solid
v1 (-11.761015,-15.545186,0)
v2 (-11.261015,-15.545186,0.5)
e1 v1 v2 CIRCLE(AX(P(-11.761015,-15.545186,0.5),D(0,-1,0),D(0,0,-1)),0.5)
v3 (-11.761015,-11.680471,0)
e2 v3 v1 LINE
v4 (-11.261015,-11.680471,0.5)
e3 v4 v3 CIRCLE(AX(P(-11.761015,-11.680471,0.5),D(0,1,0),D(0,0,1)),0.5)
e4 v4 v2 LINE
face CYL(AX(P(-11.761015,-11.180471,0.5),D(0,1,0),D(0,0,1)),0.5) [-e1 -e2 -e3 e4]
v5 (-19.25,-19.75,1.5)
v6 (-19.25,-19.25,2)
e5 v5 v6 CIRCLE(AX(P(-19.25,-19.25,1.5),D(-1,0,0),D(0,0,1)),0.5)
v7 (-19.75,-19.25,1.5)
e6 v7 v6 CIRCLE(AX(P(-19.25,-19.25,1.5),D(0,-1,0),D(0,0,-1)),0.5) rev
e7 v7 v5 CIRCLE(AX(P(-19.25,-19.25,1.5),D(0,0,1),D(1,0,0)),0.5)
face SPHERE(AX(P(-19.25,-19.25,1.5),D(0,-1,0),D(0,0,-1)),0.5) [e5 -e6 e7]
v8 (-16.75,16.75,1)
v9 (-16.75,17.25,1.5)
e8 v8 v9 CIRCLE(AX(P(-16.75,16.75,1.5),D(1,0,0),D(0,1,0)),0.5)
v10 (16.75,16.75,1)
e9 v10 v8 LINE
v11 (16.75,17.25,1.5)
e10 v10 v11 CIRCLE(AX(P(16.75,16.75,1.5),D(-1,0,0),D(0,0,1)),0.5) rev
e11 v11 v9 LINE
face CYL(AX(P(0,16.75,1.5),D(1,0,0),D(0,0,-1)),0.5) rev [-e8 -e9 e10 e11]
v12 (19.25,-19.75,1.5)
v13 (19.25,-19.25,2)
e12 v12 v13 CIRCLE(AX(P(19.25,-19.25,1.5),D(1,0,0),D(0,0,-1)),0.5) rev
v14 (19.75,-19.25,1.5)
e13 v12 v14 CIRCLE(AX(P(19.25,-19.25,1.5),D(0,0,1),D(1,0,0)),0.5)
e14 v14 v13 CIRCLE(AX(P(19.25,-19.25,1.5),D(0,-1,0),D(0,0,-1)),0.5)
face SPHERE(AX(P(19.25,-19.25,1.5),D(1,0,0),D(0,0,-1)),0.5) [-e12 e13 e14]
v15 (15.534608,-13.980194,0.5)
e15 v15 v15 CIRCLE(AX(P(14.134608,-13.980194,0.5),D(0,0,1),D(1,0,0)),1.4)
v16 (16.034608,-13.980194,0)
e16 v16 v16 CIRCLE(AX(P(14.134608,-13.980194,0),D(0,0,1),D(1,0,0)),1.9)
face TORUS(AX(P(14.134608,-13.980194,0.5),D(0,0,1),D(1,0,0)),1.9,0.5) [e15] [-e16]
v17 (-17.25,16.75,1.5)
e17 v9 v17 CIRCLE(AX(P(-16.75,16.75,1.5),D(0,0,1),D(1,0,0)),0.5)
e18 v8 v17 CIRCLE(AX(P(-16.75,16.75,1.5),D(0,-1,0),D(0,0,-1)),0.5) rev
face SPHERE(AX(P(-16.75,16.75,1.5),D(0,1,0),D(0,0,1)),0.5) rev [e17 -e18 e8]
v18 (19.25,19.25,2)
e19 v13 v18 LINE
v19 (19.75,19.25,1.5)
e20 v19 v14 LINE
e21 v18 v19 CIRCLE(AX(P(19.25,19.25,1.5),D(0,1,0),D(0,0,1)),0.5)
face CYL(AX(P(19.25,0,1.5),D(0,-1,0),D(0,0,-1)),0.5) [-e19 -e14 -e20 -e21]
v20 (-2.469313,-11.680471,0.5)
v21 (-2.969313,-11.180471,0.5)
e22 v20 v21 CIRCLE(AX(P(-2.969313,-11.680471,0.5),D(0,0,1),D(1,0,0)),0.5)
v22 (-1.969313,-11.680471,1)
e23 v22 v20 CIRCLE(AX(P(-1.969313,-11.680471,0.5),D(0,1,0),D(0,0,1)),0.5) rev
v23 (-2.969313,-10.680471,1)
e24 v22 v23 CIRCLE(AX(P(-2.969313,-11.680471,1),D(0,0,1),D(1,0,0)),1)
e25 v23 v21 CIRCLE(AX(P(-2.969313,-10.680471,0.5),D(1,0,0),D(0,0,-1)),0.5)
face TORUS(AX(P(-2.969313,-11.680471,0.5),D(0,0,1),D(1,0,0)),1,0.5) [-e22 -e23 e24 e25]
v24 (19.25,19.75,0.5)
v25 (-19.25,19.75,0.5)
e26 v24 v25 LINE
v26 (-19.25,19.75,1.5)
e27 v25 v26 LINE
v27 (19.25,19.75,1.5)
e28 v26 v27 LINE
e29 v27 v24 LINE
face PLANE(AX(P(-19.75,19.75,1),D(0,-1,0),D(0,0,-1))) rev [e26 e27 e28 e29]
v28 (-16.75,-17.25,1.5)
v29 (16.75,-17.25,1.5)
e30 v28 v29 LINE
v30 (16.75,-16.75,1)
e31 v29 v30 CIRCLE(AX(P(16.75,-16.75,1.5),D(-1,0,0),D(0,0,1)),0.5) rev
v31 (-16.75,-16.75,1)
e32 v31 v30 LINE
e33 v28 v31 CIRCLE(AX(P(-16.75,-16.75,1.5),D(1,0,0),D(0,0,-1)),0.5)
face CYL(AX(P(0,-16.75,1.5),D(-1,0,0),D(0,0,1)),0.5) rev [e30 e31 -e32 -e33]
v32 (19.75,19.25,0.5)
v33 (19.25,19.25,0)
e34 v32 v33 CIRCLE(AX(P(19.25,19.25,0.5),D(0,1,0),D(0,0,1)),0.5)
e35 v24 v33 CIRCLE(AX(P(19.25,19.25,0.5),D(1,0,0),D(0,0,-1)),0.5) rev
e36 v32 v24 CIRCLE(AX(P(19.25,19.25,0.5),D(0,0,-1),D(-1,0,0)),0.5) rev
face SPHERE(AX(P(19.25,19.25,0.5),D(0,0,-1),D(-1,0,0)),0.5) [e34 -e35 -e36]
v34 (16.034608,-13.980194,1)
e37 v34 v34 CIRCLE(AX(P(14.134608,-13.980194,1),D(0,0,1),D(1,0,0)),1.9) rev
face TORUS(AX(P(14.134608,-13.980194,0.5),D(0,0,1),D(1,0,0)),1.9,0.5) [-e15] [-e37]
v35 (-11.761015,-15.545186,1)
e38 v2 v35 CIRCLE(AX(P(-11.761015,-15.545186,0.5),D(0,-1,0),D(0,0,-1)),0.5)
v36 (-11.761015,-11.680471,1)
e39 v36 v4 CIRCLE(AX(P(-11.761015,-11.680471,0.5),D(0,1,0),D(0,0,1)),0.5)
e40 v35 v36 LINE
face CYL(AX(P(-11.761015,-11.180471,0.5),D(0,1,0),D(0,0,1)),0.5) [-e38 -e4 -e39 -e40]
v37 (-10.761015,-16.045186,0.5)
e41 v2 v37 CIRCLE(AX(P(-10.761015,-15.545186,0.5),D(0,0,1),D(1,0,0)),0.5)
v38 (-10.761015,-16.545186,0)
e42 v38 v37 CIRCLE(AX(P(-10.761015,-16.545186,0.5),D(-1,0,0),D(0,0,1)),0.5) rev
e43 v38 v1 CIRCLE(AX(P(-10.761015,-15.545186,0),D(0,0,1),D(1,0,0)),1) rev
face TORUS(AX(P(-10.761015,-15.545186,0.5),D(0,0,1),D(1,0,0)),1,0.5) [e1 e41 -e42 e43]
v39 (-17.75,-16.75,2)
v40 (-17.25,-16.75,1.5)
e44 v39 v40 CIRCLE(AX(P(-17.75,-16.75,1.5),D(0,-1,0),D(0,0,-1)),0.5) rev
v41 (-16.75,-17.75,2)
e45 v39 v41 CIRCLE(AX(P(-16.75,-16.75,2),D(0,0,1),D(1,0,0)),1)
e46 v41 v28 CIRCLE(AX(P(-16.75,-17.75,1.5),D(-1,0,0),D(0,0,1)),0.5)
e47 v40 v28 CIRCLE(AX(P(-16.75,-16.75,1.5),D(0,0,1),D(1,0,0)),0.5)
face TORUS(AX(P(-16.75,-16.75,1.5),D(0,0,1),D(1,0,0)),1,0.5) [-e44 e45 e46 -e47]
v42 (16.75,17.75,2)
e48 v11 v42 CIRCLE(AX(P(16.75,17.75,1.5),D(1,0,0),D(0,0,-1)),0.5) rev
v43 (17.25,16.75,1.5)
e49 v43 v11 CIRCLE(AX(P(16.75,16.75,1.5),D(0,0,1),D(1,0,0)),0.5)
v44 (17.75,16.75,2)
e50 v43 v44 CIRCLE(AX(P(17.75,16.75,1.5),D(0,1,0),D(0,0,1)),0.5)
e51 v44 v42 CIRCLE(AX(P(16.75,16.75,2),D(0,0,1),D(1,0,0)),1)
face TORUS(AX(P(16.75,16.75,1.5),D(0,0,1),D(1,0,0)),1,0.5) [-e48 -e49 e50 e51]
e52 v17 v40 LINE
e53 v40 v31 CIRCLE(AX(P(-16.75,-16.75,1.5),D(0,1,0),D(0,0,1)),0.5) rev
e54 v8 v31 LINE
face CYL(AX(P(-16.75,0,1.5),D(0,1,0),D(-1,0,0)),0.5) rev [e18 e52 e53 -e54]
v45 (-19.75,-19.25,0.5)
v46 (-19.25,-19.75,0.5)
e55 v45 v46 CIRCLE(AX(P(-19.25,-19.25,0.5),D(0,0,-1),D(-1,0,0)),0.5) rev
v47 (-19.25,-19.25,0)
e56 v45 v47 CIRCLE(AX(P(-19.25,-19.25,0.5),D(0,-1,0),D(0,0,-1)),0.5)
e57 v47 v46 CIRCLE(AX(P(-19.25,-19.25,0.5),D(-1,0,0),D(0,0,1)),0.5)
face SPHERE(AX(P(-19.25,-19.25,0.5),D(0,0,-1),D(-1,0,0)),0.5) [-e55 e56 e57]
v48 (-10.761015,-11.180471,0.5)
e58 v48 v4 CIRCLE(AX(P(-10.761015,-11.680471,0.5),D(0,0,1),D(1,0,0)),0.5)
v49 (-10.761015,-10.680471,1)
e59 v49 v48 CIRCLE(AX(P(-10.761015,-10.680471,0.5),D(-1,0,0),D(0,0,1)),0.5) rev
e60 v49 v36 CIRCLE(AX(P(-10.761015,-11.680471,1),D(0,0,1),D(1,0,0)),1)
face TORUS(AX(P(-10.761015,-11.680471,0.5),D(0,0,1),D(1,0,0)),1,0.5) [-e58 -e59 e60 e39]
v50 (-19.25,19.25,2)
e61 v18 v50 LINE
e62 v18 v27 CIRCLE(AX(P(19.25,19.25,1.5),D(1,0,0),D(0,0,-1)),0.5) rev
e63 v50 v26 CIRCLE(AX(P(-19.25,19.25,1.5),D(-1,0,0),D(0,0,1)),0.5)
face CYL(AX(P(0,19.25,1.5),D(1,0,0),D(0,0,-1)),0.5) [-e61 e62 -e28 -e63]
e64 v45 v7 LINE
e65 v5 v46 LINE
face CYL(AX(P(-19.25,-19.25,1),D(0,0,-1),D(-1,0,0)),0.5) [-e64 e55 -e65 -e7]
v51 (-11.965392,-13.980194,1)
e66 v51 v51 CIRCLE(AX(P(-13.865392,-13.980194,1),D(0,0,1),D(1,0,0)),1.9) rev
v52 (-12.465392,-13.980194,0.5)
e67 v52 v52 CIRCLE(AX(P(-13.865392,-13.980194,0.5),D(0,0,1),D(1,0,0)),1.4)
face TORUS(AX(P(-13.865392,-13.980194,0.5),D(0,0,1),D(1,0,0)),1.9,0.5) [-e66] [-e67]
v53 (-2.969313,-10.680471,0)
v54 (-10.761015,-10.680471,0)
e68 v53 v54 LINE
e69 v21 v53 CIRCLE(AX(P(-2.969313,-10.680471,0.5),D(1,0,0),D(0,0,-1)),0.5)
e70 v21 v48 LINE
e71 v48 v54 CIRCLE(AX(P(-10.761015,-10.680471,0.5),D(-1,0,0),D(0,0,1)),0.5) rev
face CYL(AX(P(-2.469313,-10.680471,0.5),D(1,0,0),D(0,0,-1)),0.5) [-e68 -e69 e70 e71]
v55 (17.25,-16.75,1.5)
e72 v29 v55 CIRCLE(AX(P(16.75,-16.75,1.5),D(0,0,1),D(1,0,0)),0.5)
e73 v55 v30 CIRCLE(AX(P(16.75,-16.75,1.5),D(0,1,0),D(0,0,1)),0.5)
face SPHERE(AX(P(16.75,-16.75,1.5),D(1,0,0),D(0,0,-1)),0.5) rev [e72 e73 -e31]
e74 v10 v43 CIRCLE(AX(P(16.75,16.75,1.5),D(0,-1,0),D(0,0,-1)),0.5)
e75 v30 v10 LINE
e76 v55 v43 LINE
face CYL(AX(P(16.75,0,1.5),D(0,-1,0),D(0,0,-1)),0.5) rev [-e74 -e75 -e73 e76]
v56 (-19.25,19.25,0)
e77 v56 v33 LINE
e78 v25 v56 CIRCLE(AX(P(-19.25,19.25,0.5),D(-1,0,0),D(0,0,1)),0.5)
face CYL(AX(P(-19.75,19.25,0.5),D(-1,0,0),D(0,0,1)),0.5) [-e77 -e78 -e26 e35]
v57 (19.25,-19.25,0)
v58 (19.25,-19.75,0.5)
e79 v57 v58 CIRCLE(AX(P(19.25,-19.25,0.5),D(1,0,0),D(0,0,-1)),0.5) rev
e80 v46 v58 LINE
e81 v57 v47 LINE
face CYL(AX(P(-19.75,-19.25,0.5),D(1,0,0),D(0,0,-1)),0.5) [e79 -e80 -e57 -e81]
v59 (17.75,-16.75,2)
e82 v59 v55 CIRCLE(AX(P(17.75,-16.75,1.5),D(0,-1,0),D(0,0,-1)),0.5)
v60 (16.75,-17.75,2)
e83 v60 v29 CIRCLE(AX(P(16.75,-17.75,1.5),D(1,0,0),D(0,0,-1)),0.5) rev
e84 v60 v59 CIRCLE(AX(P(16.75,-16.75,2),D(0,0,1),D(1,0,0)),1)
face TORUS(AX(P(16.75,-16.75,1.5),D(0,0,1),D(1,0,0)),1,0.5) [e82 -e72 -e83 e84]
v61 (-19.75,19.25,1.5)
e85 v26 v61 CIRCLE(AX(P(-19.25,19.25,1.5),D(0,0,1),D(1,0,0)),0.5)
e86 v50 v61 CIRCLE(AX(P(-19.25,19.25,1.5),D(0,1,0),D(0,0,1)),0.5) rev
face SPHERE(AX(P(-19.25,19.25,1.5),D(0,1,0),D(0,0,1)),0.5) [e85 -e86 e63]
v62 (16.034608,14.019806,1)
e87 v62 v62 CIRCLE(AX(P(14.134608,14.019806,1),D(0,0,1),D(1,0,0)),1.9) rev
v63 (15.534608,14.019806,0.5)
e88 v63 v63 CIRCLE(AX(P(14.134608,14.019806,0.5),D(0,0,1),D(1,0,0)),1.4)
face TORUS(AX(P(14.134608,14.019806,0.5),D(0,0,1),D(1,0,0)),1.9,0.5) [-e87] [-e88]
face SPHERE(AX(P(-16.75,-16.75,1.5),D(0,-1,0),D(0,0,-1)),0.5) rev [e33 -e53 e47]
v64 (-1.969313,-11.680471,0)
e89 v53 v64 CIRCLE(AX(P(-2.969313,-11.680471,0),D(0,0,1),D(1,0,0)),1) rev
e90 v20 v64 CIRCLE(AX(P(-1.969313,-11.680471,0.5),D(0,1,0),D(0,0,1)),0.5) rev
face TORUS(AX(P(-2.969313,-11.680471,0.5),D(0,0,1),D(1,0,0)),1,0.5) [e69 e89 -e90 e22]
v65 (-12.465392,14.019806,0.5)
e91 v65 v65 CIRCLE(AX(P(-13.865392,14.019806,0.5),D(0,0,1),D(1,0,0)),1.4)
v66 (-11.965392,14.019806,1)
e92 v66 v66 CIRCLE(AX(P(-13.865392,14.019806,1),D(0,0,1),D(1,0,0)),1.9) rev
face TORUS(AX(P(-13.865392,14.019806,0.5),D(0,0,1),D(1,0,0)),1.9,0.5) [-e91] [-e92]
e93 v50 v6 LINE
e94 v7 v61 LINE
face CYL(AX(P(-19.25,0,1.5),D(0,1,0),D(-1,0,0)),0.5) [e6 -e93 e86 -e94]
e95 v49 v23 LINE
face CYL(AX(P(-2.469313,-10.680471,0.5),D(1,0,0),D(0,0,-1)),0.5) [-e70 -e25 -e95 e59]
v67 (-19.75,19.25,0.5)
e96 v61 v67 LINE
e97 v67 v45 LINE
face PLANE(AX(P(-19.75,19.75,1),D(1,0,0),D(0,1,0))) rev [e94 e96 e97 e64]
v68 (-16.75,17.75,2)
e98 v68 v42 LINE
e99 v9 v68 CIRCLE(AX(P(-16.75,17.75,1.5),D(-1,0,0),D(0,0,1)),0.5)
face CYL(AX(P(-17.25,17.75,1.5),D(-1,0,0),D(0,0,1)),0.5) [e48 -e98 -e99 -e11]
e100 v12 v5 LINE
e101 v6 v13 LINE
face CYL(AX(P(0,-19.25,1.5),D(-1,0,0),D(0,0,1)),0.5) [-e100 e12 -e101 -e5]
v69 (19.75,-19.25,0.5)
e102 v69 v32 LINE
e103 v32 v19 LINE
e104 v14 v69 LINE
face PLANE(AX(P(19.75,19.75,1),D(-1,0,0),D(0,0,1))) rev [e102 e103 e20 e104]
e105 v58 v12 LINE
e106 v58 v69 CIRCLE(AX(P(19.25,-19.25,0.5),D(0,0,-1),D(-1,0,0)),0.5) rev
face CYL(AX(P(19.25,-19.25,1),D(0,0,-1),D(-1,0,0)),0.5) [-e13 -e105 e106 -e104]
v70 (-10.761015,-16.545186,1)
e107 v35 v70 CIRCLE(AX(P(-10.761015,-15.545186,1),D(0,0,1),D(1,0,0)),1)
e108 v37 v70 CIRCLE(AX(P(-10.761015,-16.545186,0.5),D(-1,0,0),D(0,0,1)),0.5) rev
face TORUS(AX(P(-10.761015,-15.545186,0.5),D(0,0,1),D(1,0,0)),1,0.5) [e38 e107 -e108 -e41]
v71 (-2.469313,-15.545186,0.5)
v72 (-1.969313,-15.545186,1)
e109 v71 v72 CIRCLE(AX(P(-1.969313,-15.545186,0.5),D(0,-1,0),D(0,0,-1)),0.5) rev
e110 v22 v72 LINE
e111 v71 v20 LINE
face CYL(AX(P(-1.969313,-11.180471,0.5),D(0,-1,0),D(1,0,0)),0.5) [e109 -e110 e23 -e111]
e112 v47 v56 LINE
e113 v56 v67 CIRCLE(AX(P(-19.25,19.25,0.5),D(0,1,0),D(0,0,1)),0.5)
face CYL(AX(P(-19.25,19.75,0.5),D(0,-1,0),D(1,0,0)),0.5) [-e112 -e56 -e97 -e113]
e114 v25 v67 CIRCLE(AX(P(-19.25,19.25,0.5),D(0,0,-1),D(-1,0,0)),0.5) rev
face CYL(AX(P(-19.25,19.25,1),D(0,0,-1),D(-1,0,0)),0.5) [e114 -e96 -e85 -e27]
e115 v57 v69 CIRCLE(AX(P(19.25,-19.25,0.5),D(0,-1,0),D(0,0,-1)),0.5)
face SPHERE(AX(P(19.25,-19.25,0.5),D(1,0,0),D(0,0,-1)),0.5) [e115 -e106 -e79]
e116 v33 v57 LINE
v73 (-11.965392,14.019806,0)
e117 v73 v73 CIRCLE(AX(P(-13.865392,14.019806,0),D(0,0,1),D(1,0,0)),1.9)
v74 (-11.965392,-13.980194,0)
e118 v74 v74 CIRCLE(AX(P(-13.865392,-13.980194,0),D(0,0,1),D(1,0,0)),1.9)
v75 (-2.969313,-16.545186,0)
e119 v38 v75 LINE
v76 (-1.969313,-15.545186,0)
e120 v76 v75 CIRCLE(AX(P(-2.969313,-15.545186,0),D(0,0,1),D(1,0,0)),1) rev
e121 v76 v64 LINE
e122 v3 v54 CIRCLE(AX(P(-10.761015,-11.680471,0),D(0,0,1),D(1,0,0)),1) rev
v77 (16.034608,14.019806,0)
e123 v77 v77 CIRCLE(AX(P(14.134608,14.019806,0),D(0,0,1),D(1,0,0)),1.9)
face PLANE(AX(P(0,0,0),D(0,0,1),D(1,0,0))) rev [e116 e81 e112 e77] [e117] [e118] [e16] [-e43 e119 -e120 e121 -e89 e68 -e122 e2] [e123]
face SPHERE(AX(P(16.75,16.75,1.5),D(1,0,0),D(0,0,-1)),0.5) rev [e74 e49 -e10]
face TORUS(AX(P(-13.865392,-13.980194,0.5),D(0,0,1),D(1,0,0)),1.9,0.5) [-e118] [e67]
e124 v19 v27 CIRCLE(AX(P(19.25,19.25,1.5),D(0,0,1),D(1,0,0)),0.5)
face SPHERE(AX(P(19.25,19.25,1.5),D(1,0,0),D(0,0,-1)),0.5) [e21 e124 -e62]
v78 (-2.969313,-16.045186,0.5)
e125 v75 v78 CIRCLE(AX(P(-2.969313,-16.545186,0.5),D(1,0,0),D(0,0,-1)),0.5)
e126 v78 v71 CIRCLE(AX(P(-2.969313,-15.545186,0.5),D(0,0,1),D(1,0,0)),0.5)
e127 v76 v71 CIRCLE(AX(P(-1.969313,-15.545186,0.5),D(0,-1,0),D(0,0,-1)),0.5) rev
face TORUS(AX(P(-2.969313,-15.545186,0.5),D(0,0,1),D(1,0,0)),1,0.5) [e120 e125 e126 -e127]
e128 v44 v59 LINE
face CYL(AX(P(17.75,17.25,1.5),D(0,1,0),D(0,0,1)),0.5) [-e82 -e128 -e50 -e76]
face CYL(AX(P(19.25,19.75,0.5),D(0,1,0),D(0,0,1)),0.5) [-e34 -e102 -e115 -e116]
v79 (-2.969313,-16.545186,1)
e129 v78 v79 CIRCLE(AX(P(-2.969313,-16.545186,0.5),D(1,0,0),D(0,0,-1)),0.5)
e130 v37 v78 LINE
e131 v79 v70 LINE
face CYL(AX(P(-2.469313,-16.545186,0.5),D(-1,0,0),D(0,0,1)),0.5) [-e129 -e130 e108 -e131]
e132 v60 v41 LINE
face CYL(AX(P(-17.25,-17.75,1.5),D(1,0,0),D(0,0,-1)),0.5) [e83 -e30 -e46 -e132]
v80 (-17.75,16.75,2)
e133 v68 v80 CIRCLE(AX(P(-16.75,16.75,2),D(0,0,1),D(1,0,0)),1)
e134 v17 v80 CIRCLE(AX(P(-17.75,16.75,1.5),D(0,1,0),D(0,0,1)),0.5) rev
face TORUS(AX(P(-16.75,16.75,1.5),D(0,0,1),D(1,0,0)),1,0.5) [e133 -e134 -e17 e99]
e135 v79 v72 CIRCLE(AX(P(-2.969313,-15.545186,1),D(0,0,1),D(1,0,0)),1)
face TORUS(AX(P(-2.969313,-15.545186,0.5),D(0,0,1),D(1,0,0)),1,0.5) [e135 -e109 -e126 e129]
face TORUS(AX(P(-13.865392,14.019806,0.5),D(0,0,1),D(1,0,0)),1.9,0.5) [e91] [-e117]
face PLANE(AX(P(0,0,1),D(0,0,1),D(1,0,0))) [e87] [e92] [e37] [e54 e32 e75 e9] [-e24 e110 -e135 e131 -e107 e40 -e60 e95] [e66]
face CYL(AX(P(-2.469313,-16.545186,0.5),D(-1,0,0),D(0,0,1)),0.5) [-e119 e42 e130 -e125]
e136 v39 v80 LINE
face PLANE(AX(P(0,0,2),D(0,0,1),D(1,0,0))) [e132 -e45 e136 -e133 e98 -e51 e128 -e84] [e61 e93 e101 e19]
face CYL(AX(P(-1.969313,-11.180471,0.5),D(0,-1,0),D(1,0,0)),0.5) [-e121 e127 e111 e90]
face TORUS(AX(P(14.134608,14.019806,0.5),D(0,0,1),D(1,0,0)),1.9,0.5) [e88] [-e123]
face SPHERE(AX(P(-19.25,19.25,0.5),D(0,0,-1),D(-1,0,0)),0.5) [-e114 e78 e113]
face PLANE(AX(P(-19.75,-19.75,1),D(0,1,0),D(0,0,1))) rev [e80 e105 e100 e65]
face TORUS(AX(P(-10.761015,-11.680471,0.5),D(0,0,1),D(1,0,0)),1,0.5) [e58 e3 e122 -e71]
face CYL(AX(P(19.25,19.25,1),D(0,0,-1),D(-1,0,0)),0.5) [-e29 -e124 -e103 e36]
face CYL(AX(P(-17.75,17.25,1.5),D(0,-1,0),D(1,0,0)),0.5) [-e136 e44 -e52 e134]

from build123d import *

# Parameters (mm, degrees)
SKETCH1_W           = 39.5
SKETCH1_H           = 39.5
BOSS_EXTRUDE1_DEPTH = 1
SKETCH2_W           = 39.5
SKETCH2_H           = 39.5
SKETCH2_W_2         = 34.5
SKETCH2_H_2         = 34.5
BOSS_EXTRUDE2_DEPTH = 1
SKETCH3_R           = 1.4
SKETCH3_W           = 8.791701937
SKETCH3_H           = 4.864714439
CUT_EXTRUDE1_DEPTH  = 2
FILLET1_R           = 0.5


with BuildPart() as part:
    # Sketch1 → Boss-Extrude1 (new body)
    with BuildSketch(Plane.XY):
        Rectangle(SKETCH1_W, SKETCH1_H)
    extrude(amount=BOSS_EXTRUDE1_DEPTH)

    # Sketch2 → Boss-Extrude2 (add)
    with BuildSketch(Plane.XY.offset(1)):
        Rectangle(SKETCH2_W, SKETCH2_H)
        Rectangle(SKETCH2_W_2, SKETCH2_H_2, mode=Mode.SUBTRACT)
    extrude(amount=BOSS_EXTRUDE2_DEPTH)

    # Sketch3 → Cut-Extrude1 (cut)
    with BuildSketch(Plane(origin=(0, 0, 0), x_dir=(-1, 0, 0), z_dir=(0, 0, -1))):
        with Locations((-14.134608342, 14.019805901)):
            Circle(SKETCH3_R)
        with Locations((13.865391658, 14.019805901)):
            Circle(SKETCH3_R)
        with Locations((13.865391658, -13.980194099)):
            Circle(SKETCH3_R)
        with Locations((-14.134608342, -13.980194099)):
            Circle(SKETCH3_R)
        with Locations((6.865164106, -13.612828624)):
            Rectangle(SKETCH3_W, SKETCH3_H)
    extrude(amount=-CUT_EXTRUDE1_DEPTH, mode=Mode.SUBTRACT)

    # Fillet1
    fillet1_edges = [part.edges().sort_by_distance(p)[0] for p in [
        (-19.75, 0, 2),
        (0, -19.75, 2),
        (19.75, 0, 2),
        (0, 19.75, 2),
        (-17.25, 0, 1),
        (0, -17.25, 1),
        (17.25, 0, 1),
        (0, 17.25, 1),
        (-17.25, 0, 2),
        (-17.25, -17.25, 1.5),
        (0, -17.25, 2),
        (17.25, -17.25, 1.5),
        (17.25, 0, 2),
        (17.25, 17.25, 1.5),
        (0, 17.25, 2),
        (-17.25, 17.25, 1.5),
        (-6.865164105, -16.045185843, 1),
        (-11.261015074, -13.612828624, 1),
        (-6.865164105, -11.180471404, 1),
        (-2.469313137, -13.612828624, 1),
        (15.534608342, -13.980194099, 1),
        (15.534608342, -13.980194099, 0),
        (0, -19.75, 0),
        (-12.465391658, -13.980194099, 1),
        (-12.465391658, -13.980194099, 0),
        (-12.465391658, 14.019805901, 1),
        (-12.465391658, 14.019805901, 0),
        (-19.75, 0, 0),
        (15.534608342, 14.019805901, 1),
        (15.534608342, 14.019805901, 0),
        (0, 19.75, 0),
        (-2.469313137, -16.045185843, 0.5),
        (-2.469313137, -11.180471404, 0.5),
        (-11.261015074, -11.180471404, 0.5),
        (-11.261015074, -16.045185843, 0.5),
        (-2.469313137, -13.612828624, 0),
        (-6.865164105, -16.045185843, 0),
        (-11.261015074, -13.612828624, 0),
        (-6.865164105, -11.180471404, 0),
        (19.75, 0, 0),
        (19.75, -19.75, 1),
        (-19.75, -19.75, 1),
        (-19.75, 19.75, 1),
        (19.75, 19.75, 1),
    ]]
    fillet(fillet1_edges, radius=FILLET1_R - 0.0001)  # a hair under: the kernel refuses the full size


solid = part.part
